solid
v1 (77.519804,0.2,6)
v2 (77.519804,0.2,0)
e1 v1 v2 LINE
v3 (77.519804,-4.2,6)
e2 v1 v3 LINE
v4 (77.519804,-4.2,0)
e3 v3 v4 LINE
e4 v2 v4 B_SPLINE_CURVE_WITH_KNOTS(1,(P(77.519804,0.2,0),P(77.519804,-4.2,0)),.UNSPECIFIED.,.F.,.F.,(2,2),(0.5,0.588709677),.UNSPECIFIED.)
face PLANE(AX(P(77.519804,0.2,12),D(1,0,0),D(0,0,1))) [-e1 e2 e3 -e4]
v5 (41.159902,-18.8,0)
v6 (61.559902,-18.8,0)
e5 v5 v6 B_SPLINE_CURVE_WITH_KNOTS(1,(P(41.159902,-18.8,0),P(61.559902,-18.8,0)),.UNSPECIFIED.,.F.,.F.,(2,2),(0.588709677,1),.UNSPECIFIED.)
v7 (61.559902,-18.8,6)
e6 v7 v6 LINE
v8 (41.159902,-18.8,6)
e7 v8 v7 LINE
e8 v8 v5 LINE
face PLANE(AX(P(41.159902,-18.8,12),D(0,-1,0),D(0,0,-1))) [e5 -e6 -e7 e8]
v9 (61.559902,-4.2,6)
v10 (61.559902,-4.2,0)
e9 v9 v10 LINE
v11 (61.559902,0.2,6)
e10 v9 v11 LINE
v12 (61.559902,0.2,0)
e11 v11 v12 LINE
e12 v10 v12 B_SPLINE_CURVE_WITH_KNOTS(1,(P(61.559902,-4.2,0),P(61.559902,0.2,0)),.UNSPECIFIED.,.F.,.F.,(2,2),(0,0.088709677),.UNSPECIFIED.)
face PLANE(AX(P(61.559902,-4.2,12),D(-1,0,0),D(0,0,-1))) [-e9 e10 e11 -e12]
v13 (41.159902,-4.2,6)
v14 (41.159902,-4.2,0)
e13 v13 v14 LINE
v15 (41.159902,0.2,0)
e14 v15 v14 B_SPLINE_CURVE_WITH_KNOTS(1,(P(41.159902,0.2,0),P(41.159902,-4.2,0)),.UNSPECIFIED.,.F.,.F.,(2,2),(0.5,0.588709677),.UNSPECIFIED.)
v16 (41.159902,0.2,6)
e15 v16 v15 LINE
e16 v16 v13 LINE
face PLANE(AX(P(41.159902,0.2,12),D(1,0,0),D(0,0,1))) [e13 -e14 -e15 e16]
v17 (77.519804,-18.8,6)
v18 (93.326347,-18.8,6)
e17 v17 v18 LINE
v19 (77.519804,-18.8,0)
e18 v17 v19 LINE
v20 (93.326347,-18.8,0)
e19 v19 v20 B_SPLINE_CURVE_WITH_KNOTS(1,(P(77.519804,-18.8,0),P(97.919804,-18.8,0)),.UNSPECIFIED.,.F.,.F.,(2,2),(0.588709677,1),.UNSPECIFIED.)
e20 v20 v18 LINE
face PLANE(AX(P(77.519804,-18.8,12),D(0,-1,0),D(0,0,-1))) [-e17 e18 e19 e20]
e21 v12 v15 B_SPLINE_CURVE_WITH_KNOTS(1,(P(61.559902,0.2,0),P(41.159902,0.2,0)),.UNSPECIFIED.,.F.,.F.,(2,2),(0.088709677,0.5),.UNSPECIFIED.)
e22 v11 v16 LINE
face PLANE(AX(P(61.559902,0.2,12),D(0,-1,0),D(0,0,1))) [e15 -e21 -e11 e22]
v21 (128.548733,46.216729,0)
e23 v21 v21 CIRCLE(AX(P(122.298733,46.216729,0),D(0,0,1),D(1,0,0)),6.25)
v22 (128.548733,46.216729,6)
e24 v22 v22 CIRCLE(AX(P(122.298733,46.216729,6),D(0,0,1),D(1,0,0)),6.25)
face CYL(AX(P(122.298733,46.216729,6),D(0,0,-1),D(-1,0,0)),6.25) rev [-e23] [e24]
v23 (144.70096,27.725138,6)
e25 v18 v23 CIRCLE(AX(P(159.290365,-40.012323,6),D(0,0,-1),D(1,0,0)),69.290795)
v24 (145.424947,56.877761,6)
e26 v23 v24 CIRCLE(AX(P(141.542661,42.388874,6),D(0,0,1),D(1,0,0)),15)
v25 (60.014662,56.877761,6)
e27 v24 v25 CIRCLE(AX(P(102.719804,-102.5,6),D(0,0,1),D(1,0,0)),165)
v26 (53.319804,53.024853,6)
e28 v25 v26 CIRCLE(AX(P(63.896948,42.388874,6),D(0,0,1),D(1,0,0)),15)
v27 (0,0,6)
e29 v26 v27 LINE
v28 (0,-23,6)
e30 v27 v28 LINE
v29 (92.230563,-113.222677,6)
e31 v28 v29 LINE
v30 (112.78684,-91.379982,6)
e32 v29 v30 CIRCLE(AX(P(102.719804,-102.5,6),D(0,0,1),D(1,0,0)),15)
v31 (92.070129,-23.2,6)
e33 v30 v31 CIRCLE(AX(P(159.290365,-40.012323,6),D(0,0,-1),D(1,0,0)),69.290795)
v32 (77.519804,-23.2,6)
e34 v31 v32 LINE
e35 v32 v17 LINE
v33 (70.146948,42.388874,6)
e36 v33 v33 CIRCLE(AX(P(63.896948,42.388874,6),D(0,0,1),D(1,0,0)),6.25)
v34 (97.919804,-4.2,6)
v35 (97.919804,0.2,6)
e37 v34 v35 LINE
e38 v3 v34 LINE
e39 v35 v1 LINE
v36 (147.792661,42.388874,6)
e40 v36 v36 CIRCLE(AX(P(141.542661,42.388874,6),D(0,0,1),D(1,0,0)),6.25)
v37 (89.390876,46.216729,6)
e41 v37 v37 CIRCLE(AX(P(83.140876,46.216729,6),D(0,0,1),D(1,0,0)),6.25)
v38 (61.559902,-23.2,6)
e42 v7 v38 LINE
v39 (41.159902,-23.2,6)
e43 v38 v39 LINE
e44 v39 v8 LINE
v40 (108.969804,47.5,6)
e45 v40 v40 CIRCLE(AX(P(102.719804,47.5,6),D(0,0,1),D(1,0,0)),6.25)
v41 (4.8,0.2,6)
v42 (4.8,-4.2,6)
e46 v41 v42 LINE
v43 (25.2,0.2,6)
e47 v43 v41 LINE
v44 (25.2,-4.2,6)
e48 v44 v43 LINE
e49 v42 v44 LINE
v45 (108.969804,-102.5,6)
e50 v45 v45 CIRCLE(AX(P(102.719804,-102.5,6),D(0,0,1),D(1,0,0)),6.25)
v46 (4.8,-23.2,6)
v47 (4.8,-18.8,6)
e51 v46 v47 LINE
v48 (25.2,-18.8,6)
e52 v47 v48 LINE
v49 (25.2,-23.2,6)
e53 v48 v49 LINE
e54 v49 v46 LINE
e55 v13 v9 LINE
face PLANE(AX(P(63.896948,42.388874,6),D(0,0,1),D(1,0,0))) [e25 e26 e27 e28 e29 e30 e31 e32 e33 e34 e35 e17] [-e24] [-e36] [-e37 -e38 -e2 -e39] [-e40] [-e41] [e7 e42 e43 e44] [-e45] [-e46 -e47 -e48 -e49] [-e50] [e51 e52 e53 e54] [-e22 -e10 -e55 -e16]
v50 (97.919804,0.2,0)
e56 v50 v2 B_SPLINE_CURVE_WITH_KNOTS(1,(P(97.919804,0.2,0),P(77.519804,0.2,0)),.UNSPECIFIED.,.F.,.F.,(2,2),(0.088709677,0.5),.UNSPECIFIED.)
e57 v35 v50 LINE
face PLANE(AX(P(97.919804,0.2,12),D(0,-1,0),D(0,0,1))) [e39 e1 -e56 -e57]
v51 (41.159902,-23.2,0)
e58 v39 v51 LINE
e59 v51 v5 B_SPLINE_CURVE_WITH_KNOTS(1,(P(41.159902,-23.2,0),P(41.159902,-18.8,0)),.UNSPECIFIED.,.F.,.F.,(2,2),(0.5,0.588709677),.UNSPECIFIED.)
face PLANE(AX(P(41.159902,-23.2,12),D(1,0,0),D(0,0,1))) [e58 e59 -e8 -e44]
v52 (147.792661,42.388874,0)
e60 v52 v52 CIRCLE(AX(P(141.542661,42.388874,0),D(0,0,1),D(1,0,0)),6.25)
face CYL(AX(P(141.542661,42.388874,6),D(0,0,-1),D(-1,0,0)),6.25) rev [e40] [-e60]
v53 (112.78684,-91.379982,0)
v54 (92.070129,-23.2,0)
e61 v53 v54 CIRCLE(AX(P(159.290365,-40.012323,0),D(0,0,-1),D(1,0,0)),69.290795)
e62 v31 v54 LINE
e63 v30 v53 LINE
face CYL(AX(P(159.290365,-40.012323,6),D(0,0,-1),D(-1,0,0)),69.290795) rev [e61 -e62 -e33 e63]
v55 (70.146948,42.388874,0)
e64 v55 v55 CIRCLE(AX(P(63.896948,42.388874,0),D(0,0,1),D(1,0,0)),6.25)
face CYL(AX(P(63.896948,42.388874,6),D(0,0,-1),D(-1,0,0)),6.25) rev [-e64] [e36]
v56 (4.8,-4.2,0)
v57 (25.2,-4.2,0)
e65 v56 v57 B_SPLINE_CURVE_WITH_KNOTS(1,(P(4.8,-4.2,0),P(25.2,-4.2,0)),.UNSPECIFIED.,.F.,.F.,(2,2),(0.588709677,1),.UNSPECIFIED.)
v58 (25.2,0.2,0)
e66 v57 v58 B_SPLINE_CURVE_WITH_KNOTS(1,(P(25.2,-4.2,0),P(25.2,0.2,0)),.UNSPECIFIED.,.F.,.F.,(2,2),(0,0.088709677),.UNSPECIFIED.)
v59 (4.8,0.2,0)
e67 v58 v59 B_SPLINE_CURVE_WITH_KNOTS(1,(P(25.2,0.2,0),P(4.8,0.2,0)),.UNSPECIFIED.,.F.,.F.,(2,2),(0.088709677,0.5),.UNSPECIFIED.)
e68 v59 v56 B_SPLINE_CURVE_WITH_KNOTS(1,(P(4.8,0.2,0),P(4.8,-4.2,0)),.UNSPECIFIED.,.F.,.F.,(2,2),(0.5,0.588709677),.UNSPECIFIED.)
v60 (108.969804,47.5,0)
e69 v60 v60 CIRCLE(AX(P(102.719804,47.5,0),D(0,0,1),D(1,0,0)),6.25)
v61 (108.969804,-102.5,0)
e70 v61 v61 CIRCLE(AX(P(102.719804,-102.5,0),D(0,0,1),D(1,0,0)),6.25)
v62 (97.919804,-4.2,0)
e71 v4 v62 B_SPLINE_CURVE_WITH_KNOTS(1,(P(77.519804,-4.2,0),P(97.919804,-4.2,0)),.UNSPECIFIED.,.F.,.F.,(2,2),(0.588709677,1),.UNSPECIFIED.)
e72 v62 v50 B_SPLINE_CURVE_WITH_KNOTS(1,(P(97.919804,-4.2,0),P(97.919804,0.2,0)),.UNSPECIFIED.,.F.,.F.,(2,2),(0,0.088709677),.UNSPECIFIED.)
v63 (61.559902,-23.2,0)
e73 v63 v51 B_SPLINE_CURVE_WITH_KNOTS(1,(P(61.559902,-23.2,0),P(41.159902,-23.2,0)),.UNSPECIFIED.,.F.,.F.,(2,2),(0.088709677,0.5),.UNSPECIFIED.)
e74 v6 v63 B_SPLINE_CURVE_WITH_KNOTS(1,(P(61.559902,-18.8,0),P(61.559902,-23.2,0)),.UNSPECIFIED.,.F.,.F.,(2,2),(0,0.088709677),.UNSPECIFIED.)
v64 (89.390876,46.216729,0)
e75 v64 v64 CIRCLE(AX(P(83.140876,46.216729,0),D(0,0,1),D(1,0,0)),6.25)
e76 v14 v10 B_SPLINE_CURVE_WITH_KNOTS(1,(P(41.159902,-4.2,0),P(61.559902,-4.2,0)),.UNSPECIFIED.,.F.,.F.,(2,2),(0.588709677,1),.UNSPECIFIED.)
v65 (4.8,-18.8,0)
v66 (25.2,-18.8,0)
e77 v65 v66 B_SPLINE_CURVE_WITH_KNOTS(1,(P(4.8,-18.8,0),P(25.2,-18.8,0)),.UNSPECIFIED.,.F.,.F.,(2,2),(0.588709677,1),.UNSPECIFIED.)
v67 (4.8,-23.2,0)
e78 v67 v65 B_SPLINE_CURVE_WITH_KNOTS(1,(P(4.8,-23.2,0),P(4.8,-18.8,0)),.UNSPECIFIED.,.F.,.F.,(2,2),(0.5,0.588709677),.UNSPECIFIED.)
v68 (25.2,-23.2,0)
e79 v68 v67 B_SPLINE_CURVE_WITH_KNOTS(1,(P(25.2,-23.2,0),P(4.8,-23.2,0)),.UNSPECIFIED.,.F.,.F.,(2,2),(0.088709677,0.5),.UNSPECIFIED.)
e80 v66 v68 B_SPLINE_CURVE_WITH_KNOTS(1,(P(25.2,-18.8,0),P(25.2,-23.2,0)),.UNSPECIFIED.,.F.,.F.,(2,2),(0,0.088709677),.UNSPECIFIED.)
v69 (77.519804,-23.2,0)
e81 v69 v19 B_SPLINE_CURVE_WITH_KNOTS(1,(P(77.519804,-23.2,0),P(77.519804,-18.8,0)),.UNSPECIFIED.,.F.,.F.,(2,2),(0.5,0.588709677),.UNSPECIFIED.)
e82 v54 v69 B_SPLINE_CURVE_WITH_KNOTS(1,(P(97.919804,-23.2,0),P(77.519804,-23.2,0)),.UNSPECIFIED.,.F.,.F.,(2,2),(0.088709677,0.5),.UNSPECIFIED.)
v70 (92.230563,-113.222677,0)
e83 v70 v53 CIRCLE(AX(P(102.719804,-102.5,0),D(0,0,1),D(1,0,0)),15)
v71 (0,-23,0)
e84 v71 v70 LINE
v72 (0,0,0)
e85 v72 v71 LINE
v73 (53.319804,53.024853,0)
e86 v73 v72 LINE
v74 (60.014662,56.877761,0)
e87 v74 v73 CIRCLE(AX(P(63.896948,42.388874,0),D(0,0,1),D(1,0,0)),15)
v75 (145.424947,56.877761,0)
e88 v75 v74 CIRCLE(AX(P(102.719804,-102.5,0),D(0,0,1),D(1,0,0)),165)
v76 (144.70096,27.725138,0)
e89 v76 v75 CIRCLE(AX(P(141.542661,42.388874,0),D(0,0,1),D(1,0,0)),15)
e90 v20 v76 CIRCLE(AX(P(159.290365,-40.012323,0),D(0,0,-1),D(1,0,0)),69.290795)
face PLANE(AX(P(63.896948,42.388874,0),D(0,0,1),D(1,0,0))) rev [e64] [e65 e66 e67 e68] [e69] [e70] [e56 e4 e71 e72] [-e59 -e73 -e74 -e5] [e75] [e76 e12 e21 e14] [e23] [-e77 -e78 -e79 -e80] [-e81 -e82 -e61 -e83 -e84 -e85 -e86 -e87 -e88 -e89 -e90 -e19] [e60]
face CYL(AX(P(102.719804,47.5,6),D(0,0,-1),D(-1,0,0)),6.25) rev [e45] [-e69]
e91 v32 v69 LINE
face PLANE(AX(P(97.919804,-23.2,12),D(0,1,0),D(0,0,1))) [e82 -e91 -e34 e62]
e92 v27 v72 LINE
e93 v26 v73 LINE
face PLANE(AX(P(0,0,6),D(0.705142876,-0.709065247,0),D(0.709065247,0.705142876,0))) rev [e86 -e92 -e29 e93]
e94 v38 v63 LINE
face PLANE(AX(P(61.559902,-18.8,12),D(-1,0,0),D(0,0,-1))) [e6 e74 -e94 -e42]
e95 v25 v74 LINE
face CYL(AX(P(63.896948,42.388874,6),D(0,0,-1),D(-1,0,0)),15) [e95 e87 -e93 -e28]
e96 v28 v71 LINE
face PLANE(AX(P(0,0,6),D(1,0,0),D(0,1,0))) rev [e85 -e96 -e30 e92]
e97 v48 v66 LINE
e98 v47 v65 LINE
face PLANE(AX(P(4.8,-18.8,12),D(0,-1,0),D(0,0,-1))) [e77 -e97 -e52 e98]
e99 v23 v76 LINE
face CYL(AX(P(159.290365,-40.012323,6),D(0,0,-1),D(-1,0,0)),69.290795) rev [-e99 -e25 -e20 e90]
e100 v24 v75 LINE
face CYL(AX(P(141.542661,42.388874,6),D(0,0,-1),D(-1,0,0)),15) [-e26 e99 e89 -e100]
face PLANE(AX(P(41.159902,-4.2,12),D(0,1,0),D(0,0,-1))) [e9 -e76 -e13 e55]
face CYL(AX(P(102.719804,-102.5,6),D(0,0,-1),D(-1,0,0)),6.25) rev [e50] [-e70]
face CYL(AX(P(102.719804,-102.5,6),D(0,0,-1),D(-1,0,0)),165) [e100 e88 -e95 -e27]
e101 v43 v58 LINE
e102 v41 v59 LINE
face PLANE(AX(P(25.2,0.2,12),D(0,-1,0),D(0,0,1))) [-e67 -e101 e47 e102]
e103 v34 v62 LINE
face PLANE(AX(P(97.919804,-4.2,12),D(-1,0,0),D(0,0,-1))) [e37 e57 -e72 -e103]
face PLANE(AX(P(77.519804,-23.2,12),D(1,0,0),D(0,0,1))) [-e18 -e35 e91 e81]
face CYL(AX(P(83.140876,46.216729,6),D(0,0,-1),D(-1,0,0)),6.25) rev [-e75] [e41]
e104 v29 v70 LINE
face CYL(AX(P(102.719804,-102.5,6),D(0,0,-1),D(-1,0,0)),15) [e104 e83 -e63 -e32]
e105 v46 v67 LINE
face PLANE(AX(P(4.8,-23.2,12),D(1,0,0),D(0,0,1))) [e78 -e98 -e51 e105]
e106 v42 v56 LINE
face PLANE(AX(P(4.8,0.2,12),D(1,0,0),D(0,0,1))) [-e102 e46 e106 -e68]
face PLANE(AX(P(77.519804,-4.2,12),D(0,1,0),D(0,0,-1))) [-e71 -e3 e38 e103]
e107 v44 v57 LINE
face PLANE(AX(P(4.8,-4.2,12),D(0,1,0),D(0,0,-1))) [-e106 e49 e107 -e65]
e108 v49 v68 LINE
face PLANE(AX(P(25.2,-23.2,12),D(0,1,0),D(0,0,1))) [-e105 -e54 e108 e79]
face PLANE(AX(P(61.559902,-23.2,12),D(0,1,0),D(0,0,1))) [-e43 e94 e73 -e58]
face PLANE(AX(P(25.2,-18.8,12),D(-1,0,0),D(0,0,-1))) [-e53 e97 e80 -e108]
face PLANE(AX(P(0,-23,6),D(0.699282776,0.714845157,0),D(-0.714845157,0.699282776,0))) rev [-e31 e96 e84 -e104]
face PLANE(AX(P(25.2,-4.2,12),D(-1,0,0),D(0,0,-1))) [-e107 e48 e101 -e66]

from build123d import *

# Parameters (mm, degrees)
SKETCH_1_R             = 6.25
SM_BASE_FLANGE_1_DEPTH = 6
OTHER_START            = 4.8
OTHER_1_OUTLINE_W      = 4.4
OTHER_1_OUTLINE_H      = 6
OTHER_1_DEPTH          = 20.4
OTHER_START_2          = 41.159902189
OTHER_1_2_OUTLINE_W    = 4.4
OTHER_1_2_OUTLINE_H    = 6
OTHER_1_2_DEPTH        = 20.4
OTHER_START_3          = 77.519804378
OTHER_1_3_OUTLINE_W    = 4.4
OTHER_1_3_OUTLINE_H    = 6
OTHER_1_3_DEPTH        = 20.4


# Read off the part's stored shape, not the designer's step: Выступы и прорези-Прорезь1
# Sheet-metal steps are written as plain solids
with BuildPart() as part:
    # Sketch 1 → Базовая кромка1 (new body)
    with BuildSketch(Plane.XY):
        with BuildLine():
            Line((0, 0), (0, -23))
            Line((0, -23), (92.230562732, -113.222677357))
            ThreePointArc((92.230562732, -113.222677357), (113.643192103, -112.780058395), (112.786839702, -91.379982025))
            ThreePointArc((112.786839702, -91.379982025), (92.360596545, -22.078545096), (144.700960487, 27.725138224))
            ThreePointArc((144.700960487, 27.725138224), (156.538037696, 42.016473572), (145.424946819, 56.877761338))
            ThreePointArc((145.424946819, 56.877761338), (102.719804378, 62.5), (60.014661936, 56.877761338))
            ThreePointArc((60.014661936, 56.877761338), (56.414969483, 55.389643277), (53.319804477, 53.024852653))
            Line((53.319804477, 53.024852653), (0, 0))
        make_face()
        with Locations((102.719804378, -102.5)):
            Circle(SKETCH_1_R, mode=Mode.SUBTRACT)
        with Locations((141.542661143, 42.388873943)):
            Circle(SKETCH_1_R, mode=Mode.SUBTRACT)
        with Locations((122.298733211, 46.216729206)):
            Circle(SKETCH_1_R, mode=Mode.SUBTRACT)
        with Locations((102.719804378, 47.5)):
            Circle(SKETCH_1_R, mode=Mode.SUBTRACT)
        with Locations((83.140875544, 46.216729206)):
            Circle(SKETCH_1_R, mode=Mode.SUBTRACT)
        with Locations((63.896947612, 42.388873943)):
            Circle(SKETCH_1_R, mode=Mode.SUBTRACT)
    extrude(amount=SM_BASE_FLANGE_1_DEPTH)

    # Other 1 outline → Other 1 (cut)
    with BuildSketch(Plane.YZ.offset(OTHER_START)):
        with Locations((-2, 3)):
            Rectangle(OTHER_1_OUTLINE_W, OTHER_1_OUTLINE_H)
    other_1 = extrude(amount=OTHER_1_DEPTH, mode=Mode.SUBTRACT)

    # Other 1 2 outline → Other 1 2 (cut)
    with BuildSketch(Plane.YZ.offset(OTHER_START_2)):
        with Locations((-2, 3)):
            Rectangle(OTHER_1_2_OUTLINE_W, OTHER_1_2_OUTLINE_H)
    other_1_2 = extrude(amount=OTHER_1_2_DEPTH, mode=Mode.SUBTRACT)

    # Other 1 3 outline → Other 1 3 (cut)
    with BuildSketch(Plane.YZ.offset(OTHER_START_3)):
        with Locations((-2, 3)):
            Rectangle(OTHER_1_3_OUTLINE_W, OTHER_1_3_OUTLINE_H)
    other_1_3 = extrude(amount=OTHER_1_3_DEPTH, mode=Mode.SUBTRACT)

    # Зеркальное отражение1: Other 1, Other 1 2, Other 1 3 across plane
    add(other_1.mirror(Plane.ZX.offset(-11.5)), mode=Mode.SUBTRACT)
    add(other_1_2.mirror(Plane.ZX.offset(-11.5)), mode=Mode.SUBTRACT)
    add(other_1_3.mirror(Plane.ZX.offset(-11.5)), mode=Mode.SUBTRACT)


solid = part.part
